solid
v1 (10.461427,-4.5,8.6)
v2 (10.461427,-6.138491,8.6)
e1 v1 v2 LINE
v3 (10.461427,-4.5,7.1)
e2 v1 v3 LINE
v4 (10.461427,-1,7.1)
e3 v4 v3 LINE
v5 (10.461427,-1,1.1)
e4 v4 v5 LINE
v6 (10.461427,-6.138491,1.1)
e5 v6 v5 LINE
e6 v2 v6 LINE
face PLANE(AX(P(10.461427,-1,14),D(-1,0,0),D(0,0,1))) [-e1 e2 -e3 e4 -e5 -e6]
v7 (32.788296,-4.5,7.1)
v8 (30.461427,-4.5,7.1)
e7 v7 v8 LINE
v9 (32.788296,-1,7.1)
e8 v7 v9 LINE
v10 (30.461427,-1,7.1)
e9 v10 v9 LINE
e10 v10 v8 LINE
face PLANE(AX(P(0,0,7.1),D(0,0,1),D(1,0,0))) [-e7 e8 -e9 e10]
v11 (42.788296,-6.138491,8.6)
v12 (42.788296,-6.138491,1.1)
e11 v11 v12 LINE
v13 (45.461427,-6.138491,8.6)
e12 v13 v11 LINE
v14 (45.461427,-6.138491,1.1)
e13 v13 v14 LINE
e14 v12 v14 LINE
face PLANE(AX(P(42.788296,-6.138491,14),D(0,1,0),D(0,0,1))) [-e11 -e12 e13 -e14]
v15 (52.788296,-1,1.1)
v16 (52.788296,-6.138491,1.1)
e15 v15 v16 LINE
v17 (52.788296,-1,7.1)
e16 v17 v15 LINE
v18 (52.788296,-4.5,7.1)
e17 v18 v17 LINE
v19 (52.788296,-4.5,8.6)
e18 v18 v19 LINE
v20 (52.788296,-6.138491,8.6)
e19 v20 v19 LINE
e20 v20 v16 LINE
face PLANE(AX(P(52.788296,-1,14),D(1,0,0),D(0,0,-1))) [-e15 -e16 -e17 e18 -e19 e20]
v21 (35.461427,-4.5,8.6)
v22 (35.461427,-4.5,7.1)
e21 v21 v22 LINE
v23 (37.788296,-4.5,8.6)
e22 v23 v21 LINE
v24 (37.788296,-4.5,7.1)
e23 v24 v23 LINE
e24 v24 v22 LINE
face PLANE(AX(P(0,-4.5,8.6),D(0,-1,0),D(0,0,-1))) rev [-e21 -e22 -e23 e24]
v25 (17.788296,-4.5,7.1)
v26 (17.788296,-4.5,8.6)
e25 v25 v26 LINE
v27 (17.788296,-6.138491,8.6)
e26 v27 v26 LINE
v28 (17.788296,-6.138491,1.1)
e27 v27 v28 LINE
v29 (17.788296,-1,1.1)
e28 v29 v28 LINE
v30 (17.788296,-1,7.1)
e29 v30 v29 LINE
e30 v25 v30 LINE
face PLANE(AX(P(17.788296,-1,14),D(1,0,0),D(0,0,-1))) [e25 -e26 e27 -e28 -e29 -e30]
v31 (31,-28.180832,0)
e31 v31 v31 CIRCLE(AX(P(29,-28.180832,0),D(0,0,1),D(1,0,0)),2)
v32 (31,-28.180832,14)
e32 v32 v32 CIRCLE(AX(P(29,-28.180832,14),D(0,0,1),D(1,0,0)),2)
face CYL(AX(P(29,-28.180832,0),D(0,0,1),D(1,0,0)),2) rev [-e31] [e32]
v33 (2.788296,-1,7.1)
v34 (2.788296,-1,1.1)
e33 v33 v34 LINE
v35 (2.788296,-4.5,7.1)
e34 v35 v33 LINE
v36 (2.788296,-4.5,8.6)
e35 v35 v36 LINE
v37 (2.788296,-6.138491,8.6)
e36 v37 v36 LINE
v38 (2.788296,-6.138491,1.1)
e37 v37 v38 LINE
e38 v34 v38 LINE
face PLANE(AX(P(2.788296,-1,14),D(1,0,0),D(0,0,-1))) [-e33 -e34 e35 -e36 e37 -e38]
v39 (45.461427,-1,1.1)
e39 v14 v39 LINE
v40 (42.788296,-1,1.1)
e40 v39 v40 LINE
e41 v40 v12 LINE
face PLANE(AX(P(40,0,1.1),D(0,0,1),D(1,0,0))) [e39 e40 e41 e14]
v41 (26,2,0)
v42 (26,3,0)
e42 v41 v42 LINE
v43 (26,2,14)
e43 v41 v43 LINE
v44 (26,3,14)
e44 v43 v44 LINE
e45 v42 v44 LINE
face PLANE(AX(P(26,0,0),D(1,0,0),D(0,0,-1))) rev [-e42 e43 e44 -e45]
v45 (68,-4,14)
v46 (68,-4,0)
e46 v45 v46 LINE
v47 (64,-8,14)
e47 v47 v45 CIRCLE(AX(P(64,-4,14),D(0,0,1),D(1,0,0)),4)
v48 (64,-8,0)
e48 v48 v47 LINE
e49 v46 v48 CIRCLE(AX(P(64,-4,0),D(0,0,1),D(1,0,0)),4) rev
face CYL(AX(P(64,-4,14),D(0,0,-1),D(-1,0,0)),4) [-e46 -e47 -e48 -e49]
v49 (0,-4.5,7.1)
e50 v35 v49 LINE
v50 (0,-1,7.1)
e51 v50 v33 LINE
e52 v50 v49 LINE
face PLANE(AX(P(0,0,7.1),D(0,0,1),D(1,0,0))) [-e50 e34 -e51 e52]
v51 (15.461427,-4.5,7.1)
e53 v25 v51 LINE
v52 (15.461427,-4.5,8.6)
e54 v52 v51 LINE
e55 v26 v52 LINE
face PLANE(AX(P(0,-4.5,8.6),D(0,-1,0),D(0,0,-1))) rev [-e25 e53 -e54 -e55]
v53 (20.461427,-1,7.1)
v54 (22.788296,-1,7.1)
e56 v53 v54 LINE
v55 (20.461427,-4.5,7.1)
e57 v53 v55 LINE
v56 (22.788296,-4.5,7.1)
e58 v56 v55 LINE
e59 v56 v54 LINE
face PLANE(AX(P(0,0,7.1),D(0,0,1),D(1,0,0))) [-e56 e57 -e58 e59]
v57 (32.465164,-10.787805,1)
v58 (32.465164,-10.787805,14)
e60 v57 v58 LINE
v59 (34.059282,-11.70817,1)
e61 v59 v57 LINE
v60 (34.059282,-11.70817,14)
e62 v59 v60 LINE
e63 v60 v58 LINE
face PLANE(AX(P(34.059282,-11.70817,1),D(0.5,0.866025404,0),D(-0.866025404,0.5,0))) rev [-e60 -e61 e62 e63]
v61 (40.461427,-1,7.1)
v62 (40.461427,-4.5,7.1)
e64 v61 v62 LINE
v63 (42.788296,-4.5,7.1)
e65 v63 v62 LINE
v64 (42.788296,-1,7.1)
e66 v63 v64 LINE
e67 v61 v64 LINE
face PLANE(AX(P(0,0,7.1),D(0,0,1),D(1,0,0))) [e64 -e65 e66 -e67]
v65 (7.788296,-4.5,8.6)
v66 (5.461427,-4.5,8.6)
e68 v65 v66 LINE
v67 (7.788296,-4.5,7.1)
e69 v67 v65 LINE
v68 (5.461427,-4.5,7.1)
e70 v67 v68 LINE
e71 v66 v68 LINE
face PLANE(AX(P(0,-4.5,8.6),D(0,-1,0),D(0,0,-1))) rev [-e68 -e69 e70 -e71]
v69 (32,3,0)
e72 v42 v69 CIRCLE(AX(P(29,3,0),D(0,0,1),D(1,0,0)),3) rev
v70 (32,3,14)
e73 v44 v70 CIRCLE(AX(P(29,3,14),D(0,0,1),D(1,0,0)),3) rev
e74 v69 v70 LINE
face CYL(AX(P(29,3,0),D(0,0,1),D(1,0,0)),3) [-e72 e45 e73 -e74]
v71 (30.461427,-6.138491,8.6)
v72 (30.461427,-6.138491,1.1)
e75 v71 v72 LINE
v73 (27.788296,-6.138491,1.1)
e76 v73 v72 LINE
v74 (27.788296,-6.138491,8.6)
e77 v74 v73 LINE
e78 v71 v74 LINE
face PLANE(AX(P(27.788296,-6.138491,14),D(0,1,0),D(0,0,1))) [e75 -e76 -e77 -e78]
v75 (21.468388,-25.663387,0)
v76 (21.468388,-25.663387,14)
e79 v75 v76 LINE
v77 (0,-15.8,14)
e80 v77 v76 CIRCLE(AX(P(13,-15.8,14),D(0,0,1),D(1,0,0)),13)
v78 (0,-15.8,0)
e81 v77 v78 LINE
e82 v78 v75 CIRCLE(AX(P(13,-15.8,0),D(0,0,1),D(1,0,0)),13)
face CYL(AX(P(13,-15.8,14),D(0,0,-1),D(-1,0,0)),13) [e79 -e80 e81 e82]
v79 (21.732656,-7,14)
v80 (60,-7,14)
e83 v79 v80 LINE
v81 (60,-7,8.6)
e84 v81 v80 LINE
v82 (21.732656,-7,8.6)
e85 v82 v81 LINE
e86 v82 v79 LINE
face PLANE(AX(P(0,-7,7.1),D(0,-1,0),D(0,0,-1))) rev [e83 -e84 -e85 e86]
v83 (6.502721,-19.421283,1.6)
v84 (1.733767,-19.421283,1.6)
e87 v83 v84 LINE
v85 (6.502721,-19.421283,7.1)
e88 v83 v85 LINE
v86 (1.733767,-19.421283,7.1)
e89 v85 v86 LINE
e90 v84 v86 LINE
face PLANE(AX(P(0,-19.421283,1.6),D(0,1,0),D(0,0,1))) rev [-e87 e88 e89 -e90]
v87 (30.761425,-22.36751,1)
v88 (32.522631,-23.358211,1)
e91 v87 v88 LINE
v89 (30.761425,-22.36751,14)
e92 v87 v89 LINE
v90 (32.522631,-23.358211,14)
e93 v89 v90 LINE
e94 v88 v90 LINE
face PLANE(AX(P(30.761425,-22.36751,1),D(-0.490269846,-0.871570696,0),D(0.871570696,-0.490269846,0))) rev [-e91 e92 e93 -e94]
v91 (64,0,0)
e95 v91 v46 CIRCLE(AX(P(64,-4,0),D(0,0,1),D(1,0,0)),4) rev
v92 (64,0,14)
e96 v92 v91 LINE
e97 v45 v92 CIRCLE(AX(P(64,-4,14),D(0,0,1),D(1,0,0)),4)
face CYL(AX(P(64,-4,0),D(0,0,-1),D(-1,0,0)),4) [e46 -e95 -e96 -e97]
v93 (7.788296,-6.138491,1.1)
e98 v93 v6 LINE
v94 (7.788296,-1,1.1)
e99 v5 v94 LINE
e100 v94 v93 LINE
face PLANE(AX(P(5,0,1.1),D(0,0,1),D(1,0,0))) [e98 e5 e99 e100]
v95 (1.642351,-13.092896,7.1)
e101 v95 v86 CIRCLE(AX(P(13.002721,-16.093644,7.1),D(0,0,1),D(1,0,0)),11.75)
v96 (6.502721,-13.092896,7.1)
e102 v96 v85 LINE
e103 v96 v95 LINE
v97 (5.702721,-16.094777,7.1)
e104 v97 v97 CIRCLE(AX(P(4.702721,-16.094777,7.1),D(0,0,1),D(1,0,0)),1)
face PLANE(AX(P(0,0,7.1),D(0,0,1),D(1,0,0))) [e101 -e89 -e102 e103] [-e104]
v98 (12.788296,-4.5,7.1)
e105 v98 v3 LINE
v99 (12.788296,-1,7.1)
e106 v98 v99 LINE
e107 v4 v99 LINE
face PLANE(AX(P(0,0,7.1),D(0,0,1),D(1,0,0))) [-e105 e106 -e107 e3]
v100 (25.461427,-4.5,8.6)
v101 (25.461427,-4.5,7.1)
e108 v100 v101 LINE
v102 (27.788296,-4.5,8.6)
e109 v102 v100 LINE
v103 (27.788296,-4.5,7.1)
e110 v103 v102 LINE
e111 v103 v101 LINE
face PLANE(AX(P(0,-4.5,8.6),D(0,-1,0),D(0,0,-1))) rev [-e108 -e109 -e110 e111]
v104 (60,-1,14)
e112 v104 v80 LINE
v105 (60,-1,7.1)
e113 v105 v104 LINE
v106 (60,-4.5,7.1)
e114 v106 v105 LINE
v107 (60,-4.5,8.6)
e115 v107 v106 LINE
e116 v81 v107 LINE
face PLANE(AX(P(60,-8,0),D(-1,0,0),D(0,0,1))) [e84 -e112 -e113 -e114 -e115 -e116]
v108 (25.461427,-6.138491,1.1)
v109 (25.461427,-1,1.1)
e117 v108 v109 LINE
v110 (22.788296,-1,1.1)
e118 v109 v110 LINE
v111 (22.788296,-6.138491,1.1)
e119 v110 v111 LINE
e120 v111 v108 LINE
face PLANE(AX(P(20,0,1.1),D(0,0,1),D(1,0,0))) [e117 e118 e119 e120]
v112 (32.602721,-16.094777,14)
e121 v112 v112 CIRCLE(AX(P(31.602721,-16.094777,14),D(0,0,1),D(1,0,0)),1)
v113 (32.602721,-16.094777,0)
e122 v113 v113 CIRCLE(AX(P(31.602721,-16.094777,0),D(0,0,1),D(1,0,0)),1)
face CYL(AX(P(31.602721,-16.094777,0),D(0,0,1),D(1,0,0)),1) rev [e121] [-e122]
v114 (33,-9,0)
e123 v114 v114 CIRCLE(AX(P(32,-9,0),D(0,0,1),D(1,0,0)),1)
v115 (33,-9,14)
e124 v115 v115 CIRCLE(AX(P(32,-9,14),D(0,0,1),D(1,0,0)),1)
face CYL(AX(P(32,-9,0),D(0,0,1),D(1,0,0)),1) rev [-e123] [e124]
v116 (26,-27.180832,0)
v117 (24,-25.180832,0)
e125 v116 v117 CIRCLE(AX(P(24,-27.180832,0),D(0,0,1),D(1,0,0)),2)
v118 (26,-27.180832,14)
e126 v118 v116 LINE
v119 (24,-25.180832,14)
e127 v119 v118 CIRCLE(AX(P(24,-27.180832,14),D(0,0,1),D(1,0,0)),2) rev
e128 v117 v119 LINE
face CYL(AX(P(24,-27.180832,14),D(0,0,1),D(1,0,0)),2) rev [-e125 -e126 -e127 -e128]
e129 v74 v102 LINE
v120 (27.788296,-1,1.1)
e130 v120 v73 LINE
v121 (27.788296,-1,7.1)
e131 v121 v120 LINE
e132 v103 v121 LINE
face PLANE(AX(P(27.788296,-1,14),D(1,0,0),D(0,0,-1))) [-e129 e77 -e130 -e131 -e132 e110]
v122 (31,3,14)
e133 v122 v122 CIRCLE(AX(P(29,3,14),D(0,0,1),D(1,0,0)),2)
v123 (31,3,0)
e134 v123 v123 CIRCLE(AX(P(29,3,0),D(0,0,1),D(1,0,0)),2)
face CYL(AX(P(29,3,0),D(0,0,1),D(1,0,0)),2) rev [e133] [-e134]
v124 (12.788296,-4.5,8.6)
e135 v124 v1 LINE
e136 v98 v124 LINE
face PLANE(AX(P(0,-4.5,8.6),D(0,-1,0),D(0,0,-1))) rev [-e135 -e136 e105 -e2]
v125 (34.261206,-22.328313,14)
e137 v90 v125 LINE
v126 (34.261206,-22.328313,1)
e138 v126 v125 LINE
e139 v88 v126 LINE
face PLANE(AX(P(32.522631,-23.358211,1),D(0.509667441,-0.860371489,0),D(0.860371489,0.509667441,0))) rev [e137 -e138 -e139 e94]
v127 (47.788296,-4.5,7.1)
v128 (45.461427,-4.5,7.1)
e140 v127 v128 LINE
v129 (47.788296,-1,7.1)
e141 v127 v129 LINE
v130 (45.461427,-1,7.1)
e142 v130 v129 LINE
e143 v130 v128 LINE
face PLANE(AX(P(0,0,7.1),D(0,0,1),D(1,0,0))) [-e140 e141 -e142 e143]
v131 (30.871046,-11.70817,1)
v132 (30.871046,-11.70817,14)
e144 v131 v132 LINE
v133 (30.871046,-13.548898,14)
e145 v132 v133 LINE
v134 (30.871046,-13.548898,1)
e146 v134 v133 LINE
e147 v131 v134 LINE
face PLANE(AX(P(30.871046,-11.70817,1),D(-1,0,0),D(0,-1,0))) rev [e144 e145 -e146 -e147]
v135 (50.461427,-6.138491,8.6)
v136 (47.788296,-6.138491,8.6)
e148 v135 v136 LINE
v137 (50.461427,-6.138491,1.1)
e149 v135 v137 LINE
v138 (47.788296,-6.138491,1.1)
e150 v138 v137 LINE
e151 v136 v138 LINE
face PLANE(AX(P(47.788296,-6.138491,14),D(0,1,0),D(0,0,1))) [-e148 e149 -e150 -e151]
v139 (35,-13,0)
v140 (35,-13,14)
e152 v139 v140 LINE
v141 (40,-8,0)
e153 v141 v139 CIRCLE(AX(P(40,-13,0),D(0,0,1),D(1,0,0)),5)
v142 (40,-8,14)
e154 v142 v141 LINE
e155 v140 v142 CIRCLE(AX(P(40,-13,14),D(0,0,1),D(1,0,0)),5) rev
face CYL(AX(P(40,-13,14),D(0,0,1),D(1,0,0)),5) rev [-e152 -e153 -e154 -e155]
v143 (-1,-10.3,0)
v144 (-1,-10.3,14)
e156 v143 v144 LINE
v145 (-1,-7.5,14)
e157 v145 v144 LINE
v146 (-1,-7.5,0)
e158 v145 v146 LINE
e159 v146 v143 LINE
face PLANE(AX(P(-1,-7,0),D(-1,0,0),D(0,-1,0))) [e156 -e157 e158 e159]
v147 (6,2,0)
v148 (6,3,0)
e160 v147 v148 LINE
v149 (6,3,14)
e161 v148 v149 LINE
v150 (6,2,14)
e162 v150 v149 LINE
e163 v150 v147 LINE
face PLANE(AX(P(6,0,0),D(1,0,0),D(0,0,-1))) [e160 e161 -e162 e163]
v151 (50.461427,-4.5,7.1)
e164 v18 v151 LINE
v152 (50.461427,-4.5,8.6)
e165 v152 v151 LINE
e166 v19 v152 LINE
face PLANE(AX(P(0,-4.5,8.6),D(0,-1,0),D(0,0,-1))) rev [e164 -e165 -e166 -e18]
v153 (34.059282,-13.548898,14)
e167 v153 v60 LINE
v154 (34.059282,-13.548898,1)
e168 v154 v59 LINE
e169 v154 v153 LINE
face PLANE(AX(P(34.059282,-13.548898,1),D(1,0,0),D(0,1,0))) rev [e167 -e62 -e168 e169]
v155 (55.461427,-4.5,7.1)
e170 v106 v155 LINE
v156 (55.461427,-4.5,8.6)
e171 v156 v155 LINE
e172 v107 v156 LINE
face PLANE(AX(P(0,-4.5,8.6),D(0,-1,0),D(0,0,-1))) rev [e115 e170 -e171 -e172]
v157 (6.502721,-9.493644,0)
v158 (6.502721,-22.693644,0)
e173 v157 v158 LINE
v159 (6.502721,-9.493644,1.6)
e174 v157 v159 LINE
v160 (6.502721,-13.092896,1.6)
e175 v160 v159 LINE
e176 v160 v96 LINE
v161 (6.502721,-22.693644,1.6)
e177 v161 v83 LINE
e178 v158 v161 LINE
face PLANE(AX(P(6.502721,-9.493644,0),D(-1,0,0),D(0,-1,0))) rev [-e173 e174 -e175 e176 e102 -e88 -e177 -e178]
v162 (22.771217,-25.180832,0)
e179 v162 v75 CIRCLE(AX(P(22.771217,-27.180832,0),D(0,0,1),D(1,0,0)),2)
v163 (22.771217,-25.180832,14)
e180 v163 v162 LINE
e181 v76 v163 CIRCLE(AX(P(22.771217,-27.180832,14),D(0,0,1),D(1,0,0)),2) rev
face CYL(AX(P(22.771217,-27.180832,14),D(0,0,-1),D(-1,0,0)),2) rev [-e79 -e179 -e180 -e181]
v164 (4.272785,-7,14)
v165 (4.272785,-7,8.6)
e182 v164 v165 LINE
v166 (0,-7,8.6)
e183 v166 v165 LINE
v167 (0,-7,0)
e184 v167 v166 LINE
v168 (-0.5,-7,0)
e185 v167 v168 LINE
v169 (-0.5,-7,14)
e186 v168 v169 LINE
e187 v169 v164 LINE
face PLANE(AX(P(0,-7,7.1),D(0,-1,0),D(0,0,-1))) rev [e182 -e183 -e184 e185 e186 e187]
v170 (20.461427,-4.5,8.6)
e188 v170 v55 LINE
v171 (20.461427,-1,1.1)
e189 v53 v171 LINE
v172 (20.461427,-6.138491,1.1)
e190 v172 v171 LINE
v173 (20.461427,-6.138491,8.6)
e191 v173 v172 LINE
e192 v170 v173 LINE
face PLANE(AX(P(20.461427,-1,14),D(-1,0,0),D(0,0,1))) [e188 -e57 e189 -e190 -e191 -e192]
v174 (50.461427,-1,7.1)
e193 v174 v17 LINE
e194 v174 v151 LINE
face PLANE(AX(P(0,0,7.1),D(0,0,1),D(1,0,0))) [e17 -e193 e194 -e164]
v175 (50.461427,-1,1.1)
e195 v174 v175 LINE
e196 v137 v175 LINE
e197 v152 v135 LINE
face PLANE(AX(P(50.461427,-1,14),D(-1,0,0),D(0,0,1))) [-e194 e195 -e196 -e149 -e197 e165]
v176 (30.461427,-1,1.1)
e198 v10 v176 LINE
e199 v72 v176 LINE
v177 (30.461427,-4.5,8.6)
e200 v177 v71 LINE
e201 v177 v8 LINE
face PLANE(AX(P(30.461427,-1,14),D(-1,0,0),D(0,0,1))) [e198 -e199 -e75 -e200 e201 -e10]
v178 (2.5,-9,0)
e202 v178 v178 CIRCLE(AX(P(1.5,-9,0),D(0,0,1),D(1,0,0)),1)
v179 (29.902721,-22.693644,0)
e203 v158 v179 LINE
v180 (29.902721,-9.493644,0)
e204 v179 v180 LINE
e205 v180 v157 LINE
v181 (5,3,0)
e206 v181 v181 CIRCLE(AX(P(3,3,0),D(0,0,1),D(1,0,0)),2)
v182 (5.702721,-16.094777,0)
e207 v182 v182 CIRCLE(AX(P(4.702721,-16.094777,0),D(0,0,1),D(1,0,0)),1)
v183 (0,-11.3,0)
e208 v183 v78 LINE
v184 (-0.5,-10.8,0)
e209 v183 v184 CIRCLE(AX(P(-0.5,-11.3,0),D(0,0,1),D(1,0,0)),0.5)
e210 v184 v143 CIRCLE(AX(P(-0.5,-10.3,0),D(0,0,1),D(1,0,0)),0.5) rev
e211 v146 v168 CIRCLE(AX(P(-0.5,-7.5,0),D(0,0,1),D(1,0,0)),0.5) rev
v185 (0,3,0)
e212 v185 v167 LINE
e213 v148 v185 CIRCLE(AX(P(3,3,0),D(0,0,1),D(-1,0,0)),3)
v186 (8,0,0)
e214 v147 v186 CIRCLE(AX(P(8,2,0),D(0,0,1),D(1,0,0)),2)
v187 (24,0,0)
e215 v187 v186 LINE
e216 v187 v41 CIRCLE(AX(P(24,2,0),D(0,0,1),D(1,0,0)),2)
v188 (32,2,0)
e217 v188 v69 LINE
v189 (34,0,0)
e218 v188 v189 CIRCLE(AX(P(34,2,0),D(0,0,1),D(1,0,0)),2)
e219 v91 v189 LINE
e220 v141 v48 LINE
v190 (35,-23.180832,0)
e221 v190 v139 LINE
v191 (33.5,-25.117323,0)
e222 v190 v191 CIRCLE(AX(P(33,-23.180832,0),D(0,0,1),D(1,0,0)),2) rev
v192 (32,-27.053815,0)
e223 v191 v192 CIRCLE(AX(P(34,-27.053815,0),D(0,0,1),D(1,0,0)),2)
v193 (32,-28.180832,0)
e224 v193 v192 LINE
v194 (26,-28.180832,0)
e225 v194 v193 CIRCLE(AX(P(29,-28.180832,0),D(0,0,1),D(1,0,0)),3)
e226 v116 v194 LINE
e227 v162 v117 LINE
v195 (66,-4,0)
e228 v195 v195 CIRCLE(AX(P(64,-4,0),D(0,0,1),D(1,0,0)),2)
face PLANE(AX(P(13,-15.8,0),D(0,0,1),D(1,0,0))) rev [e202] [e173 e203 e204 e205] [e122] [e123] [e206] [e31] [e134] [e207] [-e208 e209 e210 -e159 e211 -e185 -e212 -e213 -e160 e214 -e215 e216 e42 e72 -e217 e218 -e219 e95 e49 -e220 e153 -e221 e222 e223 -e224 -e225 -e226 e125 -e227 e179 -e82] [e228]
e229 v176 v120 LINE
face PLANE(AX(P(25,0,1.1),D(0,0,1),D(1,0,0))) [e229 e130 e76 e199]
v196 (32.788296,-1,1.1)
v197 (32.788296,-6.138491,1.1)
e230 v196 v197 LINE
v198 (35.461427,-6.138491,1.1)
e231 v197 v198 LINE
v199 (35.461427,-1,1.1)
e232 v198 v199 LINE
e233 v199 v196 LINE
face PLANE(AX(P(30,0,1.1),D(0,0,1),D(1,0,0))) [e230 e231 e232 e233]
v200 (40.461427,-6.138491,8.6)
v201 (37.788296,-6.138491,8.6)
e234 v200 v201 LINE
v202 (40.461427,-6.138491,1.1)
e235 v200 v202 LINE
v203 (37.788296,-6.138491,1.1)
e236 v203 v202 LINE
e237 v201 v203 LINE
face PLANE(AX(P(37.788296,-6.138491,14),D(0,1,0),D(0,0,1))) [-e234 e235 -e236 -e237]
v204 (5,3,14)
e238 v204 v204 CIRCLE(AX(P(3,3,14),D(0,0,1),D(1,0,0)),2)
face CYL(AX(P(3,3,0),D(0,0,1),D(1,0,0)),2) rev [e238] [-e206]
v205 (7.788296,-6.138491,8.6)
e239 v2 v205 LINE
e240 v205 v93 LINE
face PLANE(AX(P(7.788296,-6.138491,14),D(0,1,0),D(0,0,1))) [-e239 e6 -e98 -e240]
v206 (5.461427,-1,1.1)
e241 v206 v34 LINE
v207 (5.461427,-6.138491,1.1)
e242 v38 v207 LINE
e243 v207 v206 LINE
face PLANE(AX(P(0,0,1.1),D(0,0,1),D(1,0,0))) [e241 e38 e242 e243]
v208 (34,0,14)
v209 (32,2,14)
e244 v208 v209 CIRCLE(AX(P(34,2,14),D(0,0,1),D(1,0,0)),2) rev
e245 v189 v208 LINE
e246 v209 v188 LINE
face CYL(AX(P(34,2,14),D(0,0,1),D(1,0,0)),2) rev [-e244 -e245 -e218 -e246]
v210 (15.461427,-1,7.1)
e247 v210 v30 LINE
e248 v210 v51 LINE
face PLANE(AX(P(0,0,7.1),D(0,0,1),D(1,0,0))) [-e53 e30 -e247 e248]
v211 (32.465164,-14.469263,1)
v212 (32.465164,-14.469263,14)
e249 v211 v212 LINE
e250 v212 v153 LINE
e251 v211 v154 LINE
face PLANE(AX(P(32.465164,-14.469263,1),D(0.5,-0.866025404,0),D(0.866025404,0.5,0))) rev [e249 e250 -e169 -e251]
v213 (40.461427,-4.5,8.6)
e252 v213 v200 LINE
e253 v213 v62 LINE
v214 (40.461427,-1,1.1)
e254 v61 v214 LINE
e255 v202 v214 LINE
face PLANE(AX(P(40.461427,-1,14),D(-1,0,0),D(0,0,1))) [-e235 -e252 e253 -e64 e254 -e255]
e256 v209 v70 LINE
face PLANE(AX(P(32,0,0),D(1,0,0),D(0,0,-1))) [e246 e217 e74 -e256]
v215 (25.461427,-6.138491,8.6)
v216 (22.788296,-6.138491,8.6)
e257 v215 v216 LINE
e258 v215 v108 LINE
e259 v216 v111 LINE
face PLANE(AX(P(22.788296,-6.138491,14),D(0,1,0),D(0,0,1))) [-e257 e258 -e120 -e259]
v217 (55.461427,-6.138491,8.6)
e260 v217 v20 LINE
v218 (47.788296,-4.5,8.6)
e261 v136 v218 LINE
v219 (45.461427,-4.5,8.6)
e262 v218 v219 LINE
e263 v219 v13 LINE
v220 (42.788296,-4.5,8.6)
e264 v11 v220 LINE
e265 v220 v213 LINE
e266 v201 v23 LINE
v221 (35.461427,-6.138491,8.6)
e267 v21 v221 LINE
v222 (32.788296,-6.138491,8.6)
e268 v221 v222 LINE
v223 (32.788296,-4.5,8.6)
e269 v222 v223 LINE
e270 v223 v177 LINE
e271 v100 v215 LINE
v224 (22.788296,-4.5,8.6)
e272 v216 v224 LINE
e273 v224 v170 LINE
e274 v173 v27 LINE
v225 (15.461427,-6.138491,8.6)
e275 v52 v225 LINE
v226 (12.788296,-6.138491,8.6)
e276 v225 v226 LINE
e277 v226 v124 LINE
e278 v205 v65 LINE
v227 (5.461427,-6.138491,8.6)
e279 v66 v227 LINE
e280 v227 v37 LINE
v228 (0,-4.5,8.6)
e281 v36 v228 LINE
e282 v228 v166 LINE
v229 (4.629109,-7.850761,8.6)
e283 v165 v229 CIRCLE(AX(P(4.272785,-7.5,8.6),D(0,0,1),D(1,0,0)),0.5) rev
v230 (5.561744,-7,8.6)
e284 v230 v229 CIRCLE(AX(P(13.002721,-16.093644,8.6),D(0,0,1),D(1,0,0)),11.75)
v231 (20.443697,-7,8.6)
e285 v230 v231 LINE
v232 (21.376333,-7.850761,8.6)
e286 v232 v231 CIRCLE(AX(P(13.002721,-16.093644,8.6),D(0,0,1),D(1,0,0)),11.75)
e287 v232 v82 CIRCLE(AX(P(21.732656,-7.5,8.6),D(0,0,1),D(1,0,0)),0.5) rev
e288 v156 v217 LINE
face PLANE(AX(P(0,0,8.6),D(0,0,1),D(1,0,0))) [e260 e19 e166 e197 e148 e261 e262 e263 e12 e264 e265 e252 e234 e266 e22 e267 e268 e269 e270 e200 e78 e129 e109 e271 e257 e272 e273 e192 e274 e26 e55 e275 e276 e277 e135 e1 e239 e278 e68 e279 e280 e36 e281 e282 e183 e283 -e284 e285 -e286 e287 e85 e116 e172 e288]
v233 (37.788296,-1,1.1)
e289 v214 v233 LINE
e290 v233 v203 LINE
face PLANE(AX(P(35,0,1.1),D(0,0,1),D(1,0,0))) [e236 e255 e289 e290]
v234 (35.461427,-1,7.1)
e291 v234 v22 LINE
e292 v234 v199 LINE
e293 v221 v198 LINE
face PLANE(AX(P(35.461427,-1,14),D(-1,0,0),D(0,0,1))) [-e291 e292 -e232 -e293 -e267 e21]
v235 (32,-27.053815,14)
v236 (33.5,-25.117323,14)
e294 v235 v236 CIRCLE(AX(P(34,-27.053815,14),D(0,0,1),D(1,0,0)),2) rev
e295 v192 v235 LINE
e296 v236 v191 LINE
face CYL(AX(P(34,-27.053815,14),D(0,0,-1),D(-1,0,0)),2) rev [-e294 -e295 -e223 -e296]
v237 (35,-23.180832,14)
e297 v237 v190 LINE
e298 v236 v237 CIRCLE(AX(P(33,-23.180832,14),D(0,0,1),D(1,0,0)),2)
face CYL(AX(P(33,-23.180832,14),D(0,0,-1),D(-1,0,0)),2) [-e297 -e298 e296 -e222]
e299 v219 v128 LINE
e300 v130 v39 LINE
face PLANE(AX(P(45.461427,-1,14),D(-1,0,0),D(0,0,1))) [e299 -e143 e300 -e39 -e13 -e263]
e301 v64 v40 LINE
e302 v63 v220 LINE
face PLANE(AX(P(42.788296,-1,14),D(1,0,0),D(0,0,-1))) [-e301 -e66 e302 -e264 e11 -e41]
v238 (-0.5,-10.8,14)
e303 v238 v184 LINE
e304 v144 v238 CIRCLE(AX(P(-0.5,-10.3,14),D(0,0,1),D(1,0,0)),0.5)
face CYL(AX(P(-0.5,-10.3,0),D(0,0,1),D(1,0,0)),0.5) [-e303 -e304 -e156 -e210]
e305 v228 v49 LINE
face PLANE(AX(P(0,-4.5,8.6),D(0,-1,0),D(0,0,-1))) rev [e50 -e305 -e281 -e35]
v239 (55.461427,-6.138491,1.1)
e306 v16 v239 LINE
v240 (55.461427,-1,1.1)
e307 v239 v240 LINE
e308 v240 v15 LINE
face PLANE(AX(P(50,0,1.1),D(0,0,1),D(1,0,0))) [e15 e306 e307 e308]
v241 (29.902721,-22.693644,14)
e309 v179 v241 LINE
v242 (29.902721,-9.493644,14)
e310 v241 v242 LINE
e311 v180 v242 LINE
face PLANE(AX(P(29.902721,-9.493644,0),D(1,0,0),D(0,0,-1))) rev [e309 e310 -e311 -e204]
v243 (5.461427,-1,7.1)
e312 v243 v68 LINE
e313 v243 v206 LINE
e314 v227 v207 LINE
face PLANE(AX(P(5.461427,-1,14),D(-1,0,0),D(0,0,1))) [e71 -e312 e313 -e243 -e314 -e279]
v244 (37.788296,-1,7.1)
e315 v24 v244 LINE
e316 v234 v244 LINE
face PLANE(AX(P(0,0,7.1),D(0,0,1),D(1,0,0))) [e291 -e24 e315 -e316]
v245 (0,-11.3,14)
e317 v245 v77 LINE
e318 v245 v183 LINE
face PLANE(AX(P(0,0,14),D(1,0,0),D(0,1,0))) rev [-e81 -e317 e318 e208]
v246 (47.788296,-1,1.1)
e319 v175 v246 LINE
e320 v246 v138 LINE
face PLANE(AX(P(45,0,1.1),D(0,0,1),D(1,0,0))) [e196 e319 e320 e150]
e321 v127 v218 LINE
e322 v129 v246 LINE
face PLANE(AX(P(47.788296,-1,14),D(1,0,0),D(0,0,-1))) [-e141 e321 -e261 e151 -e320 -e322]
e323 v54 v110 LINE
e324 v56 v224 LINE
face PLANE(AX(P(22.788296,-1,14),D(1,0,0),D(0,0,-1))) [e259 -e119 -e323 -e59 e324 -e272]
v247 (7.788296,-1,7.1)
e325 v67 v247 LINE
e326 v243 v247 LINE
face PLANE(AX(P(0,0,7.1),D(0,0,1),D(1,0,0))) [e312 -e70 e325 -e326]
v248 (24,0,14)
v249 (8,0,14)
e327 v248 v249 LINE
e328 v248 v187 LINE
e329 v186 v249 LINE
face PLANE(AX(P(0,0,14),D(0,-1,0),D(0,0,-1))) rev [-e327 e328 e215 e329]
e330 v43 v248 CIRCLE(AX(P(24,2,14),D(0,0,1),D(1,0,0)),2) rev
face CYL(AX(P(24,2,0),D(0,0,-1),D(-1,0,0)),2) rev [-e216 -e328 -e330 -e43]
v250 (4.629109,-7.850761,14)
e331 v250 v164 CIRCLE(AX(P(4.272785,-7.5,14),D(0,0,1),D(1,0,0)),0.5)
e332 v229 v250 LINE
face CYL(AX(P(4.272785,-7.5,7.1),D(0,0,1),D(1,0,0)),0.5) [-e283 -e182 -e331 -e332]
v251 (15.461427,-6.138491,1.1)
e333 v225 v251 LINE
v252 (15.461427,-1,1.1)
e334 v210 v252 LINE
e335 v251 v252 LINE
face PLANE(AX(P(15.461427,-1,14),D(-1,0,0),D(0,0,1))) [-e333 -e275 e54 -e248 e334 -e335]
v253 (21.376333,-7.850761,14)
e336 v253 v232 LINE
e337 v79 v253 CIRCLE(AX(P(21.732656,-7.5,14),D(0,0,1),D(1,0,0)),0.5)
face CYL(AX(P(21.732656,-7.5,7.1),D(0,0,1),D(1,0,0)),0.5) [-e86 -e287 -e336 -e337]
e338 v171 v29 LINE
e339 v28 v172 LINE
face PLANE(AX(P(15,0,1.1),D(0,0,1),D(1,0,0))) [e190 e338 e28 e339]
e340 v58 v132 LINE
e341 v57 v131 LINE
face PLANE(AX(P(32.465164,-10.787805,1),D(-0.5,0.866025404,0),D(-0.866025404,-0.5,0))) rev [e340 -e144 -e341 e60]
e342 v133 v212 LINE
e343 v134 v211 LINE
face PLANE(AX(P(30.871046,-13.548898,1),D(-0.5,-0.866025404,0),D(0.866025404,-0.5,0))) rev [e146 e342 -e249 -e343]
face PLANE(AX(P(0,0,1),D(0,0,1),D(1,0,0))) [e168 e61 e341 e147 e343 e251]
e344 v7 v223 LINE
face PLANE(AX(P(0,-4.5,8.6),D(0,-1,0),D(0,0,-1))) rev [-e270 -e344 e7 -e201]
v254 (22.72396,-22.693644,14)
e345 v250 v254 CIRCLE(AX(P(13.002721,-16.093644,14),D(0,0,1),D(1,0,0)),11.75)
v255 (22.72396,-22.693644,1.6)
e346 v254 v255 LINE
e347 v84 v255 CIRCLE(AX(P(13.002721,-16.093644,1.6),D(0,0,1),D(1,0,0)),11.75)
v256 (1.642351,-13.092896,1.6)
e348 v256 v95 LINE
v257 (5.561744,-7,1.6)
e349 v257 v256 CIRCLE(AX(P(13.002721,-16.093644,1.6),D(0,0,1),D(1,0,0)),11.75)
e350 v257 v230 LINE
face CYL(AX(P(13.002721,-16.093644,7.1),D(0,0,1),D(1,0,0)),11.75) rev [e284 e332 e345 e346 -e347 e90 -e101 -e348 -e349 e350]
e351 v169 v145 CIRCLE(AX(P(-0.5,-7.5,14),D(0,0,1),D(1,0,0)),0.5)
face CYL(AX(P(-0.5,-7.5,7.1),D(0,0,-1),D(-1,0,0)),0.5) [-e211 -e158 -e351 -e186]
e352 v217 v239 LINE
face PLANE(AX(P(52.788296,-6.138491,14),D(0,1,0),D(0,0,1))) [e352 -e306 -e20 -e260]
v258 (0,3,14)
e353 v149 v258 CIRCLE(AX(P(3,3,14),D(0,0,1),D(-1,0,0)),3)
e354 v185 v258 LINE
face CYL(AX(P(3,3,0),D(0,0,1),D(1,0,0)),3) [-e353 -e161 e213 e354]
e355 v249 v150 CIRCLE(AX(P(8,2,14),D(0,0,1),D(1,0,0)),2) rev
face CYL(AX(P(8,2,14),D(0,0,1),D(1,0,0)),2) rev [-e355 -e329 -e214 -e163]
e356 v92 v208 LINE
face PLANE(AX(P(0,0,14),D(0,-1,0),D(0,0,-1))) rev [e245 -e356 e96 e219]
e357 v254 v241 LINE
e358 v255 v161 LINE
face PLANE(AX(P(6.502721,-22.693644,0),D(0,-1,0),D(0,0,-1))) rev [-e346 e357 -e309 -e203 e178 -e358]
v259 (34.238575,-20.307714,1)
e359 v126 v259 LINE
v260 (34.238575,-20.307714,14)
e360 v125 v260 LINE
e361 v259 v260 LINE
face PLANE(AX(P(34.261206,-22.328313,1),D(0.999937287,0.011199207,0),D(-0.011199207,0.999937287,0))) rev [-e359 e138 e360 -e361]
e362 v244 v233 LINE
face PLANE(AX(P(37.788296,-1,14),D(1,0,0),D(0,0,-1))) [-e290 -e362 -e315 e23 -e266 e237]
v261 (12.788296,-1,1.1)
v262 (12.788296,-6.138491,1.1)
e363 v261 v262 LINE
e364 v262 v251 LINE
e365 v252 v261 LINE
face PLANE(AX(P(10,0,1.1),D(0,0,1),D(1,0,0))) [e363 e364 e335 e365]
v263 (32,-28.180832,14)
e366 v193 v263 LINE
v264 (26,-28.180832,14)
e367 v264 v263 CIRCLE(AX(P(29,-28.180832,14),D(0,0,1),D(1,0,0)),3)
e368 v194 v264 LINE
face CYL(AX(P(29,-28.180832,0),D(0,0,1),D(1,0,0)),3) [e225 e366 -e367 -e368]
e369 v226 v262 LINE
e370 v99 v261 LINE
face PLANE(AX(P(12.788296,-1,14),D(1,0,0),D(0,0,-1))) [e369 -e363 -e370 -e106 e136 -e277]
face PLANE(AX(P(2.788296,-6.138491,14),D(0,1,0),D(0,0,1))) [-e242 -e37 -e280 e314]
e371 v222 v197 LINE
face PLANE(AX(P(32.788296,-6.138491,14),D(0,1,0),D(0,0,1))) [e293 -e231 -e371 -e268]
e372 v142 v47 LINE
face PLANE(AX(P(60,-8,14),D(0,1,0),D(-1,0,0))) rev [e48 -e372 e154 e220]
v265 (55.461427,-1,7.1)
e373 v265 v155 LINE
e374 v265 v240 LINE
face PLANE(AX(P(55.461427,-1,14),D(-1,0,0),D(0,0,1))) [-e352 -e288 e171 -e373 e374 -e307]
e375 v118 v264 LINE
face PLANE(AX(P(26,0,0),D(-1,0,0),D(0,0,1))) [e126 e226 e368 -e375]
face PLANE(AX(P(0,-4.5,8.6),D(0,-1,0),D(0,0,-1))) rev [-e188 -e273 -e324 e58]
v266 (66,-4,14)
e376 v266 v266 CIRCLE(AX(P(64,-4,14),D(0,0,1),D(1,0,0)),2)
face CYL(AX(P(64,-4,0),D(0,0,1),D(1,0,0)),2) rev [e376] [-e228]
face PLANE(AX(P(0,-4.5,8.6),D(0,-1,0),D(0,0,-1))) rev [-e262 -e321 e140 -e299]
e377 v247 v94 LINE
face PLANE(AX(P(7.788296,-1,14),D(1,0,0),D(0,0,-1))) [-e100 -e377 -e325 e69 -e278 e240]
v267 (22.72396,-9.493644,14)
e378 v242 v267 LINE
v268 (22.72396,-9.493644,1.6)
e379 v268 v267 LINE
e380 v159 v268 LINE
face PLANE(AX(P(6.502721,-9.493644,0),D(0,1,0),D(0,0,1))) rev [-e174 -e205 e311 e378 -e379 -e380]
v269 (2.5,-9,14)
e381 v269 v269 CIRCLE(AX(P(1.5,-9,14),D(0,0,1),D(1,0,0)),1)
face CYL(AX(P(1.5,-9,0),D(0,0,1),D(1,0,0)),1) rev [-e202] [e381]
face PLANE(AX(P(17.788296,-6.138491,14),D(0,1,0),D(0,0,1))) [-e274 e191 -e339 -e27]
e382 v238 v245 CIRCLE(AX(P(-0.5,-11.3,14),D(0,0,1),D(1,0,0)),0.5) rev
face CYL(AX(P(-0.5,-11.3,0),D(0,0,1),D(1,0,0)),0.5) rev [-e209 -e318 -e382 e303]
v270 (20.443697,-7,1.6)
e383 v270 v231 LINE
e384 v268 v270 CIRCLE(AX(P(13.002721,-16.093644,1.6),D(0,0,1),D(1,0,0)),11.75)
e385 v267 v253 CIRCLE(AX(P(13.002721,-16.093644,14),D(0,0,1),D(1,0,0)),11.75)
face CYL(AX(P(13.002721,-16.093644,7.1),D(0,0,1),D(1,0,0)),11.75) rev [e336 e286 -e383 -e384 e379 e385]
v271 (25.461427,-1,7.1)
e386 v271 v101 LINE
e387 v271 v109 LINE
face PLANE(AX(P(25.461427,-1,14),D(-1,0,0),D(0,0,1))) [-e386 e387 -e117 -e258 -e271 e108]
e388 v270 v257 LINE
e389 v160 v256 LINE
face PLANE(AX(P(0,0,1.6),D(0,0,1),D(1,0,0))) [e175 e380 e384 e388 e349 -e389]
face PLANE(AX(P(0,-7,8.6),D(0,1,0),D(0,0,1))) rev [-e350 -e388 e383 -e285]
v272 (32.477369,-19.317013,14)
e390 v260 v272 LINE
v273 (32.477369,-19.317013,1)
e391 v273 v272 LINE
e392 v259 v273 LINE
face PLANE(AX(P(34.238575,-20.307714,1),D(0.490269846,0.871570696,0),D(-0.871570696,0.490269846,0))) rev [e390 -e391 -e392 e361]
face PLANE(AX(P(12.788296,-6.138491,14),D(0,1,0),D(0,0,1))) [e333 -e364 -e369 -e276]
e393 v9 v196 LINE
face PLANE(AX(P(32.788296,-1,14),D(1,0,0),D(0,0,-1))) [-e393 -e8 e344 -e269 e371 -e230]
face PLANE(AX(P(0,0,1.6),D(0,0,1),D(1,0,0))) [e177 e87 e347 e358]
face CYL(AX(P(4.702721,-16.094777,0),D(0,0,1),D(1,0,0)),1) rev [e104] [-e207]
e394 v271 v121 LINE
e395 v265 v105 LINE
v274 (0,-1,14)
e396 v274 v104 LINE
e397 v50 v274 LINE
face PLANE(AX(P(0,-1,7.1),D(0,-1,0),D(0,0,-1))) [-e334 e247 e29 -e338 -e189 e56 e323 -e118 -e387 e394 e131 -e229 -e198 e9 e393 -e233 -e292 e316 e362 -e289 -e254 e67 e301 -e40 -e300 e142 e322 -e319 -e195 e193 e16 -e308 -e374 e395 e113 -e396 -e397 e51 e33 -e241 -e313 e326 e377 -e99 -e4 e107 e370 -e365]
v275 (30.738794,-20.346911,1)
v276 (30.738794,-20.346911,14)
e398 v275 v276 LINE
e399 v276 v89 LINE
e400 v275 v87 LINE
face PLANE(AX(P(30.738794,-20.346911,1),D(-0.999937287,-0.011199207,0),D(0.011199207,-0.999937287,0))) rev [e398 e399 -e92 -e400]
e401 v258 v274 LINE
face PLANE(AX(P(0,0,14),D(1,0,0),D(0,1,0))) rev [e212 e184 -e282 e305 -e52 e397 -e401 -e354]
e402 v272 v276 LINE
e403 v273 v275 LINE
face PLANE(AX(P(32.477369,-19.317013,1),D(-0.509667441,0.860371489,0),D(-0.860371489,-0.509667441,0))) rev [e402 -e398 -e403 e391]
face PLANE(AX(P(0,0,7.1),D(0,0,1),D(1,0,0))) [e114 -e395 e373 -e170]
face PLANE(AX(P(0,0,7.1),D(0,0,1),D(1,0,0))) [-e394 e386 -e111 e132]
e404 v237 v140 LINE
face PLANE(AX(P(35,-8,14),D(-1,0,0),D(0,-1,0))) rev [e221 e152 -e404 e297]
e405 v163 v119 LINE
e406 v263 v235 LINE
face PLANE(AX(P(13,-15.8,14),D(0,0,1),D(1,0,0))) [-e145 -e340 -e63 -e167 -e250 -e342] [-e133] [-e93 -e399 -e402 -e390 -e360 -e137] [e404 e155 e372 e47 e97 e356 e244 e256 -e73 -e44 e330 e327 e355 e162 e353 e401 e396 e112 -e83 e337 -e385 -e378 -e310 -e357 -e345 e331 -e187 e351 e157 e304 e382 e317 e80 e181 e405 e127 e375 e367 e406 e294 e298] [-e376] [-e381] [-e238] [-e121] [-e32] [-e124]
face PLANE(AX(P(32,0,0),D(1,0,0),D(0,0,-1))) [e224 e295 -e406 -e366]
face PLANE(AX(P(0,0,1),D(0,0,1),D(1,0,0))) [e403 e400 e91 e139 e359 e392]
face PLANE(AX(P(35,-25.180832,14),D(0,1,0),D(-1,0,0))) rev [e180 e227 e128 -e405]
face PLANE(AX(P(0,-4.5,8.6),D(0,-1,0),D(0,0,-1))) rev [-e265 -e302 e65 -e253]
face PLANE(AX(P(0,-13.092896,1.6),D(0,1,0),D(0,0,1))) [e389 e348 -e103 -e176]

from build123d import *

# Parameters (mm, degrees)
BODY_DEPTH                      = 14
HAUPTAUSTRAGUNG_DEPTH           = 6.9
SERVOSCHNITT_DEPTH              = 69.010587411
SERVOSCHNITT_DEPTH_BACK         = 69.010587411
SERVO_W                         = 23.4
SERVO_H                         = 13.2
VERRUNDUNG2_R                   = 5
SCHRAUBENLOCH_DEPTH             = 69.010587411
SCHRAUBENLOCH_DEPTH_BACK        = 69.010587411
SERVOLOCHSCHRAUBEN_R            = 1
FUEHRUNG_W                      = 60
FUEHRUNG_H                      = 2.5
FUEHRUNGSSCHINE_DEPTH           = 1.5
VERRUNDUNG4_R                   = 2
HALTERUNG_R                     = 1
SCHNITT_LINEAR_AUSTRAGEN2_DEPTH = 69.010587411
SKIZZE5_R                       = 1
SCHNITT_LINEAR_AUSTRAGEN3_DEPTH = 69.010587411
SCHNITT_LINEAR_START            = -6
SKIZZE8_W                       = 2.673131507
SKIZZE8_H                       = 5.13849065
SCHNITT_LINEAR_AUSTRAGEN7_DEPTH = 73.931681587
LINEARES_MUSTER1_COUNT          = 11
LINEARES_MUSTER1_PITCH          = 5
SABSCHLUSS_W                    = 8
SABSCHLUSS_H                    = 8
ABSCHLUSS_DEPTH                 = 14
SKIZZE14_R                      = 2
ENDSTUTZEN_DEPTH                = 14
SKIZZESTUTZEN_R                 = 2
STUTZEN_DEPTH                   = 14
VERRUNDUNG5_R                   = 4
VERRUNDUNG6_R                   = 2
VERRUNDUNG7_R                   = 2
SECHSKANTLOCH_DEPTH             = 13
HALTERUNGLINKS_DEPTH            = 5.5
SKIZZE15_R                      = 2
AUFSATZ_LINEAR_AUSTRAGEN1_DEPTH = 14
VERRUNDUNG8_R                   = 2
SKIZZE16_W                      = 1
SKIZZE16_H                      = 3.8
AUFSATZ_LINEAR_AUSTRAGEN2_DEPTH = 14
VERRUNDUNG10_R                  = 0.5
VERRUNDUNG11_R                  = 0.5
VERRUNDUNG12_R                  = 0.5


with BuildPart() as part:
    # P-BodySkizze → body (new body)
    with BuildSketch(Plane.XY):
        with BuildLine():
            Line((0, 0), (60, 0))
            Line((60, 0), (60, -8))
            Line((60, -8), (35, -8))
            Line((35, -8), (35, -25.18083152))
            Line((35, -25.18083152), (22, -25.18083152))
            ThreePointArc((22, -25.18083152), (17.850215987, -27.861318538), (13, -28.8))
            ThreePointArc((13, -28.8), (3.807611845, -24.992388155), (0, -15.8))
            Line((0, -15.8), (0, 0))
        make_face()
    extrude(amount=BODY_DEPTH)

    # Austrag → hauptAustragung (cut)
    with BuildSketch(Plane.XY.offset(14)):
        with BuildLine():
            ThreePointArc((20.443697295, -7), (13.002720829, -4.343644442), (5.561744363, -7))
            Line((5.561744363, -7), (20.443697295, -7))
        make_face()
        with BuildLine():
            Line((20.443697295, -7), (5.561744363, -7))
            ThreePointArc((5.561744363, -7), (7.971268428, -26.711882843), (24.752720829, -16.093644442))
            ThreePointArc((24.752720829, -16.093644442), (23.62095923, -11.062192041), (20.443697295, -7))
        make_face()
        with BuildLine():
            Line((60, -1), (0, -1))
            Line((0, -1), (0, -7))
            Line((0, -7), (5.561744363, -7))
            ThreePointArc((5.561744363, -7), (13.002720829, -4.343644442), (20.443697295, -7))
            Line((20.443697295, -7), (60, -7))
            Line((60, -7), (60, -1))
        make_face()
    extrude(amount=-HAUPTAUSTRAGUNG_DEPTH, mode=Mode.SUBTRACT)

    # servo → ServoSchnitt (cut, two sides: drawn at the far end of the back side and taken through both)
    with BuildSketch(Plane.XY.offset(14).offset(-SERVOSCHNITT_DEPTH_BACK)):
        with Locations((18.202720829, -16.093644442)):
            Rectangle(SERVO_W, SERVO_H)
    extrude(amount=SERVOSCHNITT_DEPTH + SERVOSCHNITT_DEPTH_BACK, mode=Mode.SUBTRACT)

    # Verrundung2
    verrundung2_edges = [part.edges().sort_by_distance(p)[0] for p in [
        (35, -8, 7),
    ]]
    fillet(verrundung2_edges, radius=VERRUNDUNG2_R)

    # servolochschrauben → schraubenloch (cut, two sides: drawn at the far end of the back side and taken through both)
    with BuildSketch(Plane.XY.offset(14).offset(-SCHRAUBENLOCH_DEPTH_BACK)):
        with Locations((4.702720829, -16.094776923)):
            Circle(SERVOLOCHSCHRAUBEN_R)
        with Locations((31.602720829, -16.094776923)):
            Circle(SERVOLOCHSCHRAUBEN_R)
    extrude(amount=SCHRAUBENLOCH_DEPTH + SCHRAUBENLOCH_DEPTH_BACK, mode=Mode.SUBTRACT)

    # fuehrung → Fuehrungsschine (add)
    with BuildSketch(Plane.XY.offset(7.1)):
        with Locations((30, -5.75)):
            Rectangle(FUEHRUNG_W, FUEHRUNG_H)
    extrude(amount=FUEHRUNGSSCHINE_DEPTH)

    # Verrundung4
    verrundung4_edges = [part.edges().sort_by_distance(p)[0] for p in [
        (35, -25.18083152, 7),
    ]]
    fillet(verrundung4_edges, radius=VERRUNDUNG4_R)

    # halterung → Schnitt-Linear austragen2 (cut, through all)
    with BuildSketch(Plane.XY.offset(14)):
        with Locations((1.5, -9)):
            Circle(HALTERUNG_R)
    extrude(amount=-SCHNITT_LINEAR_AUSTRAGEN2_DEPTH, mode=Mode.SUBTRACT)

    # Skizze5 → Schnitt-Linear austragen3 (cut, through all)
    with BuildSketch(Plane.XY.offset(14)):
        with Locations((32, -9)):
            Circle(SKIZZE5_R)
    extrude(amount=-SCHNITT_LINEAR_AUSTRAGEN3_DEPTH, mode=Mode.SUBTRACT)

    # Skizze8 → Schnitt-Linear austragen7 (cut)
    with BuildSketch(Plane.XY.offset(7.1).offset(SCHNITT_LINEAR_START)):
        with Locations((4.124861588, -3.569245325)):
            Rectangle(SKIZZE8_W, SKIZZE8_H)
    schnitt_linear_austragen7 = extrude(amount=SCHNITT_LINEAR_AUSTRAGEN7_DEPTH, mode=Mode.SUBTRACT)

    # Lineares Muster1: Schnitt-Linear austragen7 ×11
    with Locations(*[(i * LINEARES_MUSTER1_PITCH, 0, 0) for i in range(1, LINEARES_MUSTER1_COUNT)]):
        add(schnitt_linear_austragen7, mode=Mode.SUBTRACT)

    # sabschluss → Abschluss (add)
    with BuildSketch(Plane.XY.offset(14)):
        with Locations((64, -4)):
            Rectangle(SABSCHLUSS_W, SABSCHLUSS_H)
    extrude(amount=-ABSCHLUSS_DEPTH)

    # Skizze14 → endstutzen (cut)
    with BuildSketch(Plane.XY.offset(14)):
        with Locations((64, -4)):
            Circle(SKIZZE14_R)
    extrude(amount=-ENDSTUTZEN_DEPTH, mode=Mode.SUBTRACT)

    # SkizzeStutzen → stutzen (add)
    # profile 1 of 2: a face of its own
    with BuildSketch(Plane.XY.offset(14)):
        with BuildLine():
            Line((32, -25.18083152), (26, -25.18083152))
            Line((26, -25.18083152), (26, -28.18083152))
            ThreePointArc((26, -28.18083152), (29, -31.18083152), (32, -28.18083152))
            Line((32, -28.18083152), (32, -25.18083152))
        make_face()
        with Locations((29, -28.18083152)):
            Circle(SKIZZESTUTZEN_R, mode=Mode.SUBTRACT)
    # profile 2 of 2: a face of its own
    with BuildSketch(Plane.XY.offset(14)):
        with BuildLine():
            Line((26, 3), (26, 0))
            Line((26, 0), (32, 0))
            Line((32, 0), (32, 3))
            ThreePointArc((32, 3), (29, 6), (26, 3))
        make_face()
        with Locations((29, 3)):
            Circle(SKIZZESTUTZEN_R, mode=Mode.SUBTRACT)
    extrude(amount=-STUTZEN_DEPTH)

    # Verrundung5
    verrundung5_edges = [part.edges().sort_by_distance(p)[0] for p in [
        (68, 0, 7),
        (68, -8, 7),
    ]]
    fillet(verrundung5_edges, radius=VERRUNDUNG5_R - 0.0001)  # a hair under: the kernel refuses the full size

    # Verrundung6
    verrundung6_edges = [part.edges().sort_by_distance(p)[0] for p in [
        (33, -25.18083152, 7),
        (26, -25.18083152, 7),
        (32, -25.18083152, 7),
        (32, 0, 7),
        (26, 0, 7),
    ]]
    fillet(verrundung6_edges, radius=VERRUNDUNG6_R)

    # Verrundung7
    verrundung7_edges = [part.edges().sort_by_distance(p)[0] for p in [
        (22, -25.18083152, 7),
    ]]
    fillet(verrundung7_edges, radius=VERRUNDUNG7_R)

    # sechskant-loch → sechskantloch (cut)
    with BuildSketch(Plane.XY.offset(14)):
        Polygon((34.261205516, -22.328313106), (34.238574988, -20.307713889), (32.477369472, -19.317012893), (30.738794484, -20.346911113), (30.761425012, -22.367510329), (32.522630528, -23.358211326), align=None)
        Polygon((32.465163938, -14.469262536), (34.059281734, -13.548898198), (34.059281734, -11.708169521), (32.465163938, -10.787805182), (30.871046143, -11.708169521), (30.871046143, -13.548898198), align=None)
    extrude(amount=-SECHSKANTLOCH_DEPTH, mode=Mode.SUBTRACT)

    # halterung links → halterungLinks (cut)
    with BuildSketch(Plane.XY.offset(7.1)):
        with BuildLine():
            Line((20.443697295, -7), (5.561744363, -7))
            ThreePointArc((5.561744363, -7), (3.120742136, -9.736837295), (1.642350763, -13.092895876))
            Line((1.642350763, -13.092895876), (6.502720829, -13.092895876))
            Line((6.502720829, -13.092895876), (6.502720829, -9.493644442))
            Line((6.502720829, -9.493644442), (22.723960462, -9.493644442))
            ThreePointArc((22.723960462, -9.493644442), (21.673936488, -8.164425124), (20.443697295, -7))
        make_face()
        with BuildLine():
            Line((6.502720829, -19.421283459), (1.733767081, -19.421283459))
            ThreePointArc((1.733767081, -19.421283459), (11.192764657, -27.703405794), (22.723960462, -22.693644442))
            Line((22.723960462, -22.693644442), (6.502720829, -22.693644442))
            Line((6.502720829, -22.693644442), (6.502720829, -19.421283459))
        make_face()
    extrude(amount=-HALTERUNGLINKS_DEPTH, mode=Mode.SUBTRACT)

    # Skizze15 → Aufsatz-Linear austragen1 (add)
    with BuildSketch(Plane.XY.offset(14)):
        with BuildLine():
            Line((0, 0), (6, 0))
            Line((6, 0), (6, 3))
            ThreePointArc((6, 3), (3, 6), (0, 3))
            Line((0, 3), (0, 0))
        make_face()
        with Locations((3, 3)):
            Circle(SKIZZE15_R, mode=Mode.SUBTRACT)
    extrude(amount=-AUFSATZ_LINEAR_AUSTRAGEN1_DEPTH)

    # Verrundung8
    verrundung8_edges = [part.edges().sort_by_distance(p)[0] for p in [
        (6, 0, 7),
    ]]
    fillet(verrundung8_edges, radius=VERRUNDUNG8_R)

    # Skizze16 → Aufsatz-Linear austragen2 (add)
    with BuildSketch(Plane.XY.offset(14)):
        with Locations((-0.5, -8.9)):
            Rectangle(SKIZZE16_W, SKIZZE16_H)
    extrude(amount=-AUFSATZ_LINEAR_AUSTRAGEN2_DEPTH)

    # Verrundung10
    verrundung10_edges = [part.edges().sort_by_distance(p)[0] for p in [
        (0, -10.8, 7),
        (-1, -10.8, 7),
        (-1, -7, 7),
    ]]
    fillet(verrundung10_edges, radius=VERRUNDUNG10_R - 0.0001)  # a hair under: the kernel refuses the full size

    # Verrundung11
    verrundung11_edges = [part.edges().sort_by_distance(p)[0] for p in [
        (5.561744363, -7, 11.3),
    ]]
    fillet(verrundung11_edges, radius=VERRUNDUNG11_R)

    # Verrundung12
    verrundung12_edges = [part.edges().sort_by_distance(p)[0] for p in [
        (20.443697295, -7, 11.3),
    ]]
    fillet(verrundung12_edges, radius=VERRUNDUNG12_R)


solid = part.part
